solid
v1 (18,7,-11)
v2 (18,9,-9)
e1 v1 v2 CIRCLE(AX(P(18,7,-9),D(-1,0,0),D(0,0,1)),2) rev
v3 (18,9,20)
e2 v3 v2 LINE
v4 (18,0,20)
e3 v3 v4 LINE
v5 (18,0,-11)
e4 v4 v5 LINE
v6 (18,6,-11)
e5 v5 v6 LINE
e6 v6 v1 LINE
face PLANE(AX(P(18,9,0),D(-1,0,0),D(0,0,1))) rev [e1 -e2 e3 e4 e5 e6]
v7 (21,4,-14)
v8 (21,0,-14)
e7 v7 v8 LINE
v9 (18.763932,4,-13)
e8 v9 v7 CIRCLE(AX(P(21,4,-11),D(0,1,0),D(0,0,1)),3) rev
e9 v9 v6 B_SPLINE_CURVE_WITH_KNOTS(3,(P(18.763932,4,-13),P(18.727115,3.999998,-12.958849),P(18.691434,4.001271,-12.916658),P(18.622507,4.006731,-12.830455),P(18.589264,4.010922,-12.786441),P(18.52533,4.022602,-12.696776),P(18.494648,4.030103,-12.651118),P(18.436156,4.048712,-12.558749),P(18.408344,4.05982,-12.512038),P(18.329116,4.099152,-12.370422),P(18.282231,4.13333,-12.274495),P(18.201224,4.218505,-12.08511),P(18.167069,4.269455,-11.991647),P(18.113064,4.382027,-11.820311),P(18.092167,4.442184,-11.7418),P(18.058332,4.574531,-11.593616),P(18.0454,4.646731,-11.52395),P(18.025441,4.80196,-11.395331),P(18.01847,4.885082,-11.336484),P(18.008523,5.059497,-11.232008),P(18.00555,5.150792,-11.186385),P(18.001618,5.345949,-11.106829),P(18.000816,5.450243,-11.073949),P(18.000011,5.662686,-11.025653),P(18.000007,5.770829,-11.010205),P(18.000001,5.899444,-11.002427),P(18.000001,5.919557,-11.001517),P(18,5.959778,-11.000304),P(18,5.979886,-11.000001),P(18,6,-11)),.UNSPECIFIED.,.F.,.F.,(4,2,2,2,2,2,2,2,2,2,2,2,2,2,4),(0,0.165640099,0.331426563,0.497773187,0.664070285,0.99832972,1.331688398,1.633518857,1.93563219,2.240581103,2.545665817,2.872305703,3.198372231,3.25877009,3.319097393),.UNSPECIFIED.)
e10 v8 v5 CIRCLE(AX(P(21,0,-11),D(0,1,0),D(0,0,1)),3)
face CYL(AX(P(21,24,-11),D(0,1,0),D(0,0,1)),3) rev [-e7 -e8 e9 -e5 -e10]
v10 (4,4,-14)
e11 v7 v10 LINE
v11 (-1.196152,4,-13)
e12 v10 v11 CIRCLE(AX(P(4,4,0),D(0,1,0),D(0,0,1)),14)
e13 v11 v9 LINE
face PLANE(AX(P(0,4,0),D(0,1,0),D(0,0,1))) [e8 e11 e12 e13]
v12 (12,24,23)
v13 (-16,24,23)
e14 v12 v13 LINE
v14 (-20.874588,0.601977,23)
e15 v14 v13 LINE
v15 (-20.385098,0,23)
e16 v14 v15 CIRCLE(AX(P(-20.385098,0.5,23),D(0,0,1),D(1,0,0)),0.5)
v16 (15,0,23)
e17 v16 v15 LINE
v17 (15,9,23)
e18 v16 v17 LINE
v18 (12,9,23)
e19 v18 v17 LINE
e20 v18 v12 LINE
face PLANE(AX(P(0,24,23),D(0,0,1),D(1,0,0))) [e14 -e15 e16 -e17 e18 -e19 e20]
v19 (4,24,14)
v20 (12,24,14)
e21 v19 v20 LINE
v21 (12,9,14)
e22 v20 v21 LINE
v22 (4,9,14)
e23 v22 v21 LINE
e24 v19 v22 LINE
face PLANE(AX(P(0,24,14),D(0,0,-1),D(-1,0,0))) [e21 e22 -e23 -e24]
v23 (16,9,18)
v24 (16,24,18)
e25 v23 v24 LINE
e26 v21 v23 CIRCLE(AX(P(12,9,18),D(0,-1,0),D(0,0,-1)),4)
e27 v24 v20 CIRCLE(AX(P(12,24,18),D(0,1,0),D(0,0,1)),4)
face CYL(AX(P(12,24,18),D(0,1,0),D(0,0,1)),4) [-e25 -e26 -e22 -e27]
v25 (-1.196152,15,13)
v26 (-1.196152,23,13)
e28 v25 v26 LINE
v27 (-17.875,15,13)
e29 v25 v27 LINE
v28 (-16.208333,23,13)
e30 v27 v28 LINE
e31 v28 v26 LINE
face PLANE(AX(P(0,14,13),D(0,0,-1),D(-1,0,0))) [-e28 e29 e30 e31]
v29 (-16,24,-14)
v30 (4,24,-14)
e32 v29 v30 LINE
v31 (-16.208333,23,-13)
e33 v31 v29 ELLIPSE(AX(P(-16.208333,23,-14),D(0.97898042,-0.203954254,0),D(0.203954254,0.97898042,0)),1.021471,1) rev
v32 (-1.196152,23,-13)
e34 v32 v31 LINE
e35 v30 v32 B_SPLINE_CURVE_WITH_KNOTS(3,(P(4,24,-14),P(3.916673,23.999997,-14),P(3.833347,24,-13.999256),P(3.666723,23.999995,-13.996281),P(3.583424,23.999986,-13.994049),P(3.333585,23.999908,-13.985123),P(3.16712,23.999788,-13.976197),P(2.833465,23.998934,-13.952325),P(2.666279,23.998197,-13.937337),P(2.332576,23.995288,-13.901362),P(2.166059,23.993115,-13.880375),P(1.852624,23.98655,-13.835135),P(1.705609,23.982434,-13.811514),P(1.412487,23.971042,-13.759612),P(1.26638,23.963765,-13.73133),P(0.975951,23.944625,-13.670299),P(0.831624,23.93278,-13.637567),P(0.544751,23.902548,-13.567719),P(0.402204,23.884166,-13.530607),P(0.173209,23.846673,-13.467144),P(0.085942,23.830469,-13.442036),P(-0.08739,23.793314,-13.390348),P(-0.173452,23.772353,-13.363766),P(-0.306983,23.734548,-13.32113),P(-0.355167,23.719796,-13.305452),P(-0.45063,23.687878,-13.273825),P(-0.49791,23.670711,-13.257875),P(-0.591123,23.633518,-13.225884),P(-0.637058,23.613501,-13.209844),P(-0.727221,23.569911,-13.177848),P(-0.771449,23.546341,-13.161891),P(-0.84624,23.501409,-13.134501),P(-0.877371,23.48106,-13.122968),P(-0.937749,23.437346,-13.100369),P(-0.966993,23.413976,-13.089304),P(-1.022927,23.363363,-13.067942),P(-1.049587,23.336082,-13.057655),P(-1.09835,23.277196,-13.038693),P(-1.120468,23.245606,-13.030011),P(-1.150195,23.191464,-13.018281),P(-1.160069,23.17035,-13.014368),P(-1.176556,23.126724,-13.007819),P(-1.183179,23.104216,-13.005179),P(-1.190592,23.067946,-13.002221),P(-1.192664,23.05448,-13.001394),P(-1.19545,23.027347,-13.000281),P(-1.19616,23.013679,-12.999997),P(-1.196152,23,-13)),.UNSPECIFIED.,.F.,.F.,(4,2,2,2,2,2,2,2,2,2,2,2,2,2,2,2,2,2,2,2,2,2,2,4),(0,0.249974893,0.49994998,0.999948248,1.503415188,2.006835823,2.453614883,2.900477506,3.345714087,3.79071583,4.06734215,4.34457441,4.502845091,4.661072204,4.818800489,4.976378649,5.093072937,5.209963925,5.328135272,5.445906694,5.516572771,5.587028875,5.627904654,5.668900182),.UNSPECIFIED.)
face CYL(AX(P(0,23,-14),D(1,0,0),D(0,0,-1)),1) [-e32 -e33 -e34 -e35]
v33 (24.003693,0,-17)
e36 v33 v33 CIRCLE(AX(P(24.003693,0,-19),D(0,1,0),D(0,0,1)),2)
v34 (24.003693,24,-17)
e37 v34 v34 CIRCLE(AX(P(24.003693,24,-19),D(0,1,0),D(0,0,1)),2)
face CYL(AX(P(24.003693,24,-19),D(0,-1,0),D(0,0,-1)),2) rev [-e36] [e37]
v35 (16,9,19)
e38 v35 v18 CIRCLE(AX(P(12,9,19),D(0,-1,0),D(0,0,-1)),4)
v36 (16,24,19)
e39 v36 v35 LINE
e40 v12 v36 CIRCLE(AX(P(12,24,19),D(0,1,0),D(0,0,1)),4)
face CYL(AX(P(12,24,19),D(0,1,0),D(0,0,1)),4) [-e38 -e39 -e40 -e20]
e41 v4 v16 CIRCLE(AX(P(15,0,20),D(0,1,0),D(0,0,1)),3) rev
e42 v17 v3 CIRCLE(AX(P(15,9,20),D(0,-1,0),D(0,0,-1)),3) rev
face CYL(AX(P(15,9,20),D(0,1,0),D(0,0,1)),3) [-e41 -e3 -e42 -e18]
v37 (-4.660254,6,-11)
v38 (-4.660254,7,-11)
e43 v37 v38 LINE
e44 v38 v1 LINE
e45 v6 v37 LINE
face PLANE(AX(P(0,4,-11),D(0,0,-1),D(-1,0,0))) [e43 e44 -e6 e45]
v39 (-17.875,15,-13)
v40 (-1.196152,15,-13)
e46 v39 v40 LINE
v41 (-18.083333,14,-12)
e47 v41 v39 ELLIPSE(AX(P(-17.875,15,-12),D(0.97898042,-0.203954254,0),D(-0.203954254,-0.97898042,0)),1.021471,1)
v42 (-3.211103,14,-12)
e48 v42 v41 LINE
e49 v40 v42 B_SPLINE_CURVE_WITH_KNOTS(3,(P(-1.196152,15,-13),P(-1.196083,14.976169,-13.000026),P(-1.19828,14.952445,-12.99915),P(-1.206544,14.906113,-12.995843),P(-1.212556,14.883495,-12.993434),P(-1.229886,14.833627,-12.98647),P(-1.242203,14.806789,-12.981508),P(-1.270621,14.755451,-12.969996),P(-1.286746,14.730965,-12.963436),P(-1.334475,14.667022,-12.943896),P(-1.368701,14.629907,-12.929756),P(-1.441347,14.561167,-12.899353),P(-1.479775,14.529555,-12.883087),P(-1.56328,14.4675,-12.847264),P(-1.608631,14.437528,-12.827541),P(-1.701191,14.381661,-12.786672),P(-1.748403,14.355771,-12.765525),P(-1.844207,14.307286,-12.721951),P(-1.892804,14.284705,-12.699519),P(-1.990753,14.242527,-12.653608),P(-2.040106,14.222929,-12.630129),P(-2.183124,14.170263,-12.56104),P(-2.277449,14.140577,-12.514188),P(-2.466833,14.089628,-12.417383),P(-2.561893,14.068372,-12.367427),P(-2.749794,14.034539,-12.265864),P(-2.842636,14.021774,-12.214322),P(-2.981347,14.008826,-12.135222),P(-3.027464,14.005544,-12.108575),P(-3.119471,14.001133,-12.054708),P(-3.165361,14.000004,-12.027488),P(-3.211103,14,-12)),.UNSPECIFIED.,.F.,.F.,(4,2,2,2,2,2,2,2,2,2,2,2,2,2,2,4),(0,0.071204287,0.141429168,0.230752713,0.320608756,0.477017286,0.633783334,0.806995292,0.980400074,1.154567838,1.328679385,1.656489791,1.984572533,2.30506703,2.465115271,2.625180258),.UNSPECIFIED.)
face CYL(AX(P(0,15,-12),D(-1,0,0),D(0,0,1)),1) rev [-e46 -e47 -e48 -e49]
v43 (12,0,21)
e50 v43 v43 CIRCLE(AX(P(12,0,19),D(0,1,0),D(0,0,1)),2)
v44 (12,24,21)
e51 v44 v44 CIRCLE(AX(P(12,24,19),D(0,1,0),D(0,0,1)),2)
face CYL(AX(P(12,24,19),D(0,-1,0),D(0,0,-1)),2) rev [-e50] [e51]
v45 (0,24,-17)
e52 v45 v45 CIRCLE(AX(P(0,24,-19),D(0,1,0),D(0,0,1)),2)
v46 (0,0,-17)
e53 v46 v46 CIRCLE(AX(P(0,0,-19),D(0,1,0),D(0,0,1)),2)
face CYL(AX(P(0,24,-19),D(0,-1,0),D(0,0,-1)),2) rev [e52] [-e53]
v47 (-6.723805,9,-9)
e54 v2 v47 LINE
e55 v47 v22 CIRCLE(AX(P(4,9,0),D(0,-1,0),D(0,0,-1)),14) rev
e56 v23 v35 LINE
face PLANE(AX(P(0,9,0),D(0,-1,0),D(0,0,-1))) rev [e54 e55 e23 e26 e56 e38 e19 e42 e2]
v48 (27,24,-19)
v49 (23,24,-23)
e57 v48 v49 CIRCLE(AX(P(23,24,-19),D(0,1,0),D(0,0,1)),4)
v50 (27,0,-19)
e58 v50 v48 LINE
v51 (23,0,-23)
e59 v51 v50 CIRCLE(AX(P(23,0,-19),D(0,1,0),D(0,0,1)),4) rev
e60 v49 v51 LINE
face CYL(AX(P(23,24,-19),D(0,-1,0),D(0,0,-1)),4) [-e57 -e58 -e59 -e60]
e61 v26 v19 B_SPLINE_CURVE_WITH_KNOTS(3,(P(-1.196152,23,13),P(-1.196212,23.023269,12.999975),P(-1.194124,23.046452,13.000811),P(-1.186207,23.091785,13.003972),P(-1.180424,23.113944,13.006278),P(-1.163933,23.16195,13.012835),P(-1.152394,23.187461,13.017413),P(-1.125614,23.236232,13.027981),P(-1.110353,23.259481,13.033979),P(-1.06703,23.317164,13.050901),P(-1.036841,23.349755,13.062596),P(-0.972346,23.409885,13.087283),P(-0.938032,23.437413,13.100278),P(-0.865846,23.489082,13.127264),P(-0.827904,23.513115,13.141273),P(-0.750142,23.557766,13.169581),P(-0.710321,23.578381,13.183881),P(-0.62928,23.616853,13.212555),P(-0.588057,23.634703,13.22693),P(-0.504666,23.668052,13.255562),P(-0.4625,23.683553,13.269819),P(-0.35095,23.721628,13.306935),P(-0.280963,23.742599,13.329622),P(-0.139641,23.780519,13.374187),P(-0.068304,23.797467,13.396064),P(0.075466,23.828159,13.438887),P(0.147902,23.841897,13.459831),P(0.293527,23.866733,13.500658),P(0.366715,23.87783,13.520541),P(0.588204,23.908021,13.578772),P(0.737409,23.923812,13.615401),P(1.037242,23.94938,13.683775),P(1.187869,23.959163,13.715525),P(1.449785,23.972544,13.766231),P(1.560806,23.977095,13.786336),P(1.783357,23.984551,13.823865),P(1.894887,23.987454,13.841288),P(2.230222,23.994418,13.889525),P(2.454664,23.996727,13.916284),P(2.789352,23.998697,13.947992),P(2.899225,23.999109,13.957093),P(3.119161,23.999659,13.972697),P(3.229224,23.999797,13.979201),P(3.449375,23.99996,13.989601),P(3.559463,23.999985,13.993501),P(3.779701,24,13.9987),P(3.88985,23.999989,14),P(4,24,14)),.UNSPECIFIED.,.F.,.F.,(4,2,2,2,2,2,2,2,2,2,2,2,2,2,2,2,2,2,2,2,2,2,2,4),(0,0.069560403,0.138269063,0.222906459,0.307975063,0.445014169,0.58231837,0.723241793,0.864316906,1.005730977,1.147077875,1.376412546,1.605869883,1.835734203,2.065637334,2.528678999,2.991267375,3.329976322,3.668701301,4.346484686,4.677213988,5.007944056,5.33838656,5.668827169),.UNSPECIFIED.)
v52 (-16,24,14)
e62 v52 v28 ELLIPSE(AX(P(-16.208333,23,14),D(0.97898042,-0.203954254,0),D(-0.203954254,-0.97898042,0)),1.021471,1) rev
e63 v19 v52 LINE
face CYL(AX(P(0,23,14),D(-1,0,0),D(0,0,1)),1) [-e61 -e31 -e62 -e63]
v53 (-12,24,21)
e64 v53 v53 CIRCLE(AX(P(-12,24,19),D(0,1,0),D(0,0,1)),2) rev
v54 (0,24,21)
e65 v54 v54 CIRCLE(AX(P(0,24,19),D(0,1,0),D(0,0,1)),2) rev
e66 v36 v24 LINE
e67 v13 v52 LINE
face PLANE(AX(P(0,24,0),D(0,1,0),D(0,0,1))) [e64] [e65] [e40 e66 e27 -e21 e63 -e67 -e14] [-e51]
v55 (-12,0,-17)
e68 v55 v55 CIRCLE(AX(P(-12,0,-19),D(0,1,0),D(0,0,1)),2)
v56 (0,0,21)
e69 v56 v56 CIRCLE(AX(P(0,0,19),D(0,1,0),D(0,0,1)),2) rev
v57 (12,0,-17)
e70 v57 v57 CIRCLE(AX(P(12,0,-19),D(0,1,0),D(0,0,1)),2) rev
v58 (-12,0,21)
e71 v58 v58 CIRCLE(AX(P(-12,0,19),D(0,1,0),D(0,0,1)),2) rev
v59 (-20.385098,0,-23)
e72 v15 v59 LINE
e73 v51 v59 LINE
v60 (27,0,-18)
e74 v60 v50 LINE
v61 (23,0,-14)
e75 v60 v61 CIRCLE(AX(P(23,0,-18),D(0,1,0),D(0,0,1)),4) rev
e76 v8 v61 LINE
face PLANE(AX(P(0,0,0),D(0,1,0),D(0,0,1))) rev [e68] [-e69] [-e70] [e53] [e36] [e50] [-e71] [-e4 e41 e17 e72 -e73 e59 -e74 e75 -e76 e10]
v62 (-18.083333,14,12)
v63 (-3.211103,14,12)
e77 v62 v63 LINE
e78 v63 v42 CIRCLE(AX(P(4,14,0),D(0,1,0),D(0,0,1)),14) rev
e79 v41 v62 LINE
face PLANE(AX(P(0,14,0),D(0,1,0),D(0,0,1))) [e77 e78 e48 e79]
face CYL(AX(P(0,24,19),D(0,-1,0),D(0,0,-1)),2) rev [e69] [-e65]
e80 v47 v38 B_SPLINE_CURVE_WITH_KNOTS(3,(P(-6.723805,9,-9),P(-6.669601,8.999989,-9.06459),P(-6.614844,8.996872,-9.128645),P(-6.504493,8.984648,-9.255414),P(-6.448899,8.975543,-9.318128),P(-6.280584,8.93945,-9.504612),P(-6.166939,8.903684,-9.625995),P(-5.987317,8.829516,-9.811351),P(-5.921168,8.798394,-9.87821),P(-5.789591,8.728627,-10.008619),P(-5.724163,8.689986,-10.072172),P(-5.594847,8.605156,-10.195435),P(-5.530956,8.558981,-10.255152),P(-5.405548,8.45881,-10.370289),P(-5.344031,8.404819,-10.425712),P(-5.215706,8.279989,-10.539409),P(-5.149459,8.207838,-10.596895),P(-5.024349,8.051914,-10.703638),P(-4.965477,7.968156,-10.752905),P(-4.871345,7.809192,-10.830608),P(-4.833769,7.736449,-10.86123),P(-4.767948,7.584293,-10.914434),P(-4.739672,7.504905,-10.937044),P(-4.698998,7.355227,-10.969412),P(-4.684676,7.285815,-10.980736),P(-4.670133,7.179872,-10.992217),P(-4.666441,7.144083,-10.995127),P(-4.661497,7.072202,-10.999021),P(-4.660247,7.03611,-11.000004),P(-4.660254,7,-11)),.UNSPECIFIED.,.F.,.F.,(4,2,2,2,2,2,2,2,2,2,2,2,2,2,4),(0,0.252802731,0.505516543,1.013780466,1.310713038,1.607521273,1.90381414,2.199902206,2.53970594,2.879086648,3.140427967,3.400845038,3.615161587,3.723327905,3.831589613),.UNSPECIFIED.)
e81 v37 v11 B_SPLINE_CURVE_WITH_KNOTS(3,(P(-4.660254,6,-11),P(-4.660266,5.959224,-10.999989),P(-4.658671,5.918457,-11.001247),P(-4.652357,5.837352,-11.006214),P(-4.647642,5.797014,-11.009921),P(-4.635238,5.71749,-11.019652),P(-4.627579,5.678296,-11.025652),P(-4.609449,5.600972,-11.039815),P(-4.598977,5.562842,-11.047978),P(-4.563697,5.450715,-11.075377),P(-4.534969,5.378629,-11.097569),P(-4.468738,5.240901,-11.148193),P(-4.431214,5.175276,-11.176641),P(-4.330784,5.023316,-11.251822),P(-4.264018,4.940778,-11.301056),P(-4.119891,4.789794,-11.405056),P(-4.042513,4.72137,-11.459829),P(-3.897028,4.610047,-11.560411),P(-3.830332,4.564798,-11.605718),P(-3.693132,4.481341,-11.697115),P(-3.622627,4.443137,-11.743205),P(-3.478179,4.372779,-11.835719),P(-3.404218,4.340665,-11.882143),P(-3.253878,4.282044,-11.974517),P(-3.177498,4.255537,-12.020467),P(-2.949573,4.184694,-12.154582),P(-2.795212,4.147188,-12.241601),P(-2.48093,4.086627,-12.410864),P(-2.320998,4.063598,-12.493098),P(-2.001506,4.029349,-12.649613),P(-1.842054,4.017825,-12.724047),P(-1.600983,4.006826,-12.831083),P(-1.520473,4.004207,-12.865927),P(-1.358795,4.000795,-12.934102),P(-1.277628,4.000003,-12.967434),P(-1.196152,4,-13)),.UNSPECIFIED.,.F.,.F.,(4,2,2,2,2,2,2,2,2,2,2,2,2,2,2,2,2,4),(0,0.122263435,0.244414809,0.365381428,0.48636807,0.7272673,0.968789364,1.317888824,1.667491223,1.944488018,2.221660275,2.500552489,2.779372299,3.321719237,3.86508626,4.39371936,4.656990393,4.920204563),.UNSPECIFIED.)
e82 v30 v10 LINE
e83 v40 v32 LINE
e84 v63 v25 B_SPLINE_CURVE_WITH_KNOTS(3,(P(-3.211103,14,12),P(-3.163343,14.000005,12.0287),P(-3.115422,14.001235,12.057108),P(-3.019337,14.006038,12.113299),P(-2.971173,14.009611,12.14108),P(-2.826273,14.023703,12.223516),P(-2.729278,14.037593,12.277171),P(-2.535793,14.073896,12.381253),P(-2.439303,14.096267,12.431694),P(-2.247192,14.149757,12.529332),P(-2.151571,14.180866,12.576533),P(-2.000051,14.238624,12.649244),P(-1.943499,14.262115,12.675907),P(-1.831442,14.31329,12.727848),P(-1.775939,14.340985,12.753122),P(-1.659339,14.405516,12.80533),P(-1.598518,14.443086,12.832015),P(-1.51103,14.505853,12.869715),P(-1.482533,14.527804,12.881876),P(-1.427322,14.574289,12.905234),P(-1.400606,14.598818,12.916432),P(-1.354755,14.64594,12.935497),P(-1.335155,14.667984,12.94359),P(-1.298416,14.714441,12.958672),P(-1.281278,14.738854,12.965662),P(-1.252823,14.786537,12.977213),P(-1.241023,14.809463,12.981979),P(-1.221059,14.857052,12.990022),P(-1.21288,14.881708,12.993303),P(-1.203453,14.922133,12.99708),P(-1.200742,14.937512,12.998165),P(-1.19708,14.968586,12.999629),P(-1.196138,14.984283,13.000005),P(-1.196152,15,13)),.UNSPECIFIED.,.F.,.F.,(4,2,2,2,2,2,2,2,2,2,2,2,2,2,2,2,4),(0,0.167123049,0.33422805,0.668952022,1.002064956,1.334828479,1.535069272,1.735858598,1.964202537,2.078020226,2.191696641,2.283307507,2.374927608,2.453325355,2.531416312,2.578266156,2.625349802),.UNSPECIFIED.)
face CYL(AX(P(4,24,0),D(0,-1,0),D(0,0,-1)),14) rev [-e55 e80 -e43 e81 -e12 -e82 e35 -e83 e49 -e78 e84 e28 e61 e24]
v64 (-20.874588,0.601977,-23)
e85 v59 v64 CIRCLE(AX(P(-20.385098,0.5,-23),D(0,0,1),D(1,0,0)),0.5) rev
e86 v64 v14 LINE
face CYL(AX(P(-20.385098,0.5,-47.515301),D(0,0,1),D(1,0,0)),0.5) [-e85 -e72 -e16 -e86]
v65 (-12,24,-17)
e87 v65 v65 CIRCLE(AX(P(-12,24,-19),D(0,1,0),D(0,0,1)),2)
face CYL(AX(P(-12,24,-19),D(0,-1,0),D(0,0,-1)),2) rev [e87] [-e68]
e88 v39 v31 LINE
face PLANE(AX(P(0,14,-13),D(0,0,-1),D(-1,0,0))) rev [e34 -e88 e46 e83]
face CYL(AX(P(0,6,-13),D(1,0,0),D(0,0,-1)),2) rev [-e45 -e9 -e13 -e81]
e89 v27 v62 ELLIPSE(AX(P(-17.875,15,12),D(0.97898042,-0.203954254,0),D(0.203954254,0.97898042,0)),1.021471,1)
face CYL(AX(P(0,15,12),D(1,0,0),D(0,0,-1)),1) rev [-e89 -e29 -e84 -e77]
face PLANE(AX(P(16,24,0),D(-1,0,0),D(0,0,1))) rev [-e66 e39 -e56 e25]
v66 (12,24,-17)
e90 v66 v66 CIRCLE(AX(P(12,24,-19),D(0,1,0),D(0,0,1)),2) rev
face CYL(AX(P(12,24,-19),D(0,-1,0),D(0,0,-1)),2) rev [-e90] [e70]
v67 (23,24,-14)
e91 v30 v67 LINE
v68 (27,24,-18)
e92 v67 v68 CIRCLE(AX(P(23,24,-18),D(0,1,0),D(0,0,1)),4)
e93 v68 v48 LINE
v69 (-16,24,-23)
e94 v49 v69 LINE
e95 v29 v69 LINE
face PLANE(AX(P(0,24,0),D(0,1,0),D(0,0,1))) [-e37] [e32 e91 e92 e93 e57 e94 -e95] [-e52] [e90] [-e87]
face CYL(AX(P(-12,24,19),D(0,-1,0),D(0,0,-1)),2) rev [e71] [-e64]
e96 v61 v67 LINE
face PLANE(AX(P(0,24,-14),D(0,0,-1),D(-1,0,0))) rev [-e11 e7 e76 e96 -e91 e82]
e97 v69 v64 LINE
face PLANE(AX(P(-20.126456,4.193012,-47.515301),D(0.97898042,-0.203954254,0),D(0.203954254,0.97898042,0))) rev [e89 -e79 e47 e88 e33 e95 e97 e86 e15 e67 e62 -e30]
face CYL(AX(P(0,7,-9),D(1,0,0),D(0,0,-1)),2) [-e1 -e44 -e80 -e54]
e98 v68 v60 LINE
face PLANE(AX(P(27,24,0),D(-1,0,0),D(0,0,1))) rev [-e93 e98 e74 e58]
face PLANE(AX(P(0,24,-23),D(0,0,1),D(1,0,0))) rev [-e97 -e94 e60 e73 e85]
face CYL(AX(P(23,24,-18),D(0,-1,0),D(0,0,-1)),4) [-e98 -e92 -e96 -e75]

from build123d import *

# Parameters (mm, degrees)
SKETCH2_R           = 2
SKETCH2_R_2         = 2.0000000000000004
SKETCH2_R_3         = 2.0000000000000036
BOSS_EXTRUDE1_DEPTH = 24
BOSS_EXTRUDE2_DEPTH = 46
CUT_EXTRUDE1_START  = -10
CUT_EXTRUDE1_DEPTH  = 10
FILLET1_R           = 1
FILLET2_R           = 0.5
FILLET3_R           = 4
BOSS_EXTRUDE3_START = -9
BOSS_EXTRUDE3_DEPTH = 9
FILLET4_R           = 3
CUT_EXTRUDE2_START  = -5
CUT_EXTRUDE2_DEPTH  = 5
FILLET5_R           = 2


with BuildPart() as part:
    # Sketch2 → Boss-Extrude1 (new body)
    with BuildSketch(Plane(origin=(0, 0, 0), x_dir=(1, 0, 0), z_dir=(0, 1, 0))):
        with BuildLine():
            ThreePointArc((-10.00000000000001, 1.71e-15), (-7.224972160321737, 8.36660026534089), (3.0642e-13, 13.41640786499884))
            ThreePointArc((3.0642e-13, 13.41640786499884), (1.9788258499060016, 13.85333371629342), (4.000000000000001, 14.00000000000001))
            Line((4, 14.00000000000001), (27, 14))
            Line((27, 14), (27, 23.000000000000007))
            Line((27, 23.000000000000007), (-16, 23))
            Line((-16, 23.000000000000004), (-16, -22.999999999999996))
            Line((-16, -22.999999999999996), (15.999999999999996, -22.999999999999993))
            Line((15.999999999999996, -22.999999999999993), (15.999999999999996, -14))
            Line((15.999999999999996, -14), (4, -14.00000000000001))
            ThreePointArc((3.9999999999999973, -14.00000000000001), (-5.899494936611674, -9.899494936611672), (-10.00000000000001, 1.71e-15))
        make_face()
        with Locations(Location((-11.999999999999995, -19, 0), (0, 0, 270))):
            Circle(SKETCH2_R, mode=Mode.SUBTRACT)
        with Locations(Location((4.65e-15, -19, 0), (0, 0, 270))):
            Circle(SKETCH2_R_2, mode=Mode.SUBTRACT)
        with Locations(Location((11.999999999999995, -19, 0), (0, 0, 270))):
            Circle(SKETCH2_R, mode=Mode.SUBTRACT)
        with Locations(Location((-12, 19, 0), (0, 0, 270))):
            Circle(SKETCH2_R_2, mode=Mode.SUBTRACT)
        with Locations(Location((4.7e-16, 19, 0), (0, 0, 270))):
            Circle(SKETCH2_R, mode=Mode.SUBTRACT)
        with Locations(Location((12, 19, 0), (0, 0, 270))):
            Circle(SKETCH2_R, mode=Mode.SUBTRACT)
        with Locations(Location((24.003693078979538, 19, 0), (0, 0, 270))):
            Circle(SKETCH2_R_3, mode=Mode.SUBTRACT)
    extrude(amount=BOSS_EXTRUDE1_DEPTH)

    # Sketch4 → Boss-Extrude2 (add)
    with BuildSketch(Plane.XY.offset(22.999999999999993)):
        Polygon((-21.000000000000004, -1.04e-15), (-16.000000000000004, 24), (-16.000000000000004, 0), align=None)
    extrude(amount=-BOSS_EXTRUDE2_DEPTH)

    # Sketch5 → Cut-Extrude1 (cut)
    with BuildSketch(Plane(origin=(0, 24, 0), x_dir=(1, 0, 0), z_dir=(0, 1, 0)).offset(CUT_EXTRUDE1_START)):
        with BuildLine():
            Line((-16, 0), (-10.000000000000007, 0))
            ThreePointArc((-10.000000000000007, 3.5391e-13), (-7.591939740998584, 7.850282354225094), (-1.1961524227063602, 13.000000000000117))
            Line((-1.196152422706339, 13), (-16, 12.999999999999998))
            Line((-16, 13.000000000000004), (-16, 0))
        make_face()
        Polygon((-21.000000000000004, 0), (-16, 0), (-16, 13.000000000000004), (-21.000000000000004, 12.999999999999998), align=None)
        with BuildLine():
            ThreePointArc((-1.1961524227063673, -13.000000000000114), (-7.591939740998785, -7.850282354224801), (-10.000000000000007, 3.5391e-13))
            Line((-10.000000000000007, 0), (-16, 0))
            Line((-16, 0), (-16, -13))
            Line((-15.999999999999998, -13.000000000000002), (-1.1961524227063371, -13))
        make_face()
        Polygon((-16, -13), (-16, 0), (-21.000000000000004, 0), (-21, -13), align=None)
    extrude(amount=CUT_EXTRUDE1_DEPTH, mode=Mode.SUBTRACT)

    # Fillet1
    fillet1_edges = [part.edges().sort_by_distance(p)[0] for p in [
        (-9.639742878019842, 14, -13.000000000000032),
        (-8.598076211353176, 24, 13.000000000000036),
        (-9.639742878019844, 14, 13.000000000000032),
        (-8.598076211353174, 24, -13.000000000000036),
    ]]
    fillet(fillet1_edges, radius=FILLET1_R - 0.0001)  # a hair under: the kernel refuses the full size

    # Fillet2
    fillet2_edges = [part.edges().sort_by_distance(p)[0] for p in [
        (-21, -1.04e-15, -7.11e-15),
    ]]
    fillet(fillet2_edges, radius=FILLET2_R)

    # Fillet3
    fillet3_edges = [part.edges().sort_by_distance(p)[0] for p in [
        (15.999999999999996, 12, 14),
        (15.999999999999996, 12, 22.999999999999993),
        (27, 12, -23.000000000000007),
        (27, 12, -14),
    ]]
    fillet(fillet3_edges, radius=FILLET3_R)

    # Sketch6 → Boss-Extrude3 (add)
    with BuildSketch(Plane.XZ.offset(BOSS_EXTRUDE3_START)):
        with BuildLine():
            ThreePointArc((4, 14.00000000000001), (-10.00000000000001, 8.6e-16), (3.9999999999999982, -14.00000000000001))
            Line((3.9999999999999964, -14.00000000000001), (18.00000000000001, -13.999999999999998))
            Line((18.00000000000001, -14.000000000000004), (18.00000000000001, 22.999999999999996))
            Line((18.00000000000001, 22.999999999999993), (11.999999999999996, 22.999999999999993))
            ThreePointArc((11.999999999999996, 22.999999999999993), (14.828427124746188, 21.828427124746185), (15.999999999999998, 18.999999999999993))
            Line((15.999999999999996, 18.999999999999993), (15.999999999999996, 18.000000000000007))
            ThreePointArc((15.999999999999996, 18.000000000000007), (14.828427124746185, 15.171572875253815), (11.999999999999993, 14.000000000000005))
            Line((11.999999999999993, 14.000000000000007), (4, 14.000000000000009))
        make_face()
    extrude(amount=BOSS_EXTRUDE3_DEPTH)

    # Fillet4
    fillet4_edges = [part.edges().sort_by_distance(p)[0] for p in [
        (18.00000000000001, 4.5, 22.999999999999993),
        (18.00000000000001, 4.5, -14),
    ]]
    fillet(fillet4_edges, radius=FILLET4_R)

    # Sketch7 → Cut-Extrude2 (cut)
    with BuildSketch(Plane(origin=(0, 9, 0), x_dir=(1, 0, 0), z_dir=(0, 1, 0)).offset(CUT_EXTRUDE2_START)):
        with BuildLine():
            Line((-4.66025403784441, 10.999999999999995), (18.00000000000001, 10.999999999999995))
            ThreePointArc((18.00000000000001, 10.999999999999995), (18.878679656440365, 13.121320343559638), (21.00000000000001, 13.999999999999995))
            Line((21.00000000000001, 13.999999999999995), (4, 14.00000000000001))
            ThreePointArc((4, 14.000000000000009), (-0.5825756949558523, 13.228756555322958), (-4.660254037844406, 10.999999999999995))
        make_face()
    extrude(amount=CUT_EXTRUDE2_DEPTH, mode=Mode.SUBTRACT)

    # Fillet5
    fillet5_edges = [part.edges().sort_by_distance(p)[0] for p in [
        (6.6698729810778, 9, -10.999999999999995),
        (6.6698729810778, 4, -10.999999999999995),
    ]]
    fillet(fillet5_edges, radius=FILLET5_R)


solid = part.part
